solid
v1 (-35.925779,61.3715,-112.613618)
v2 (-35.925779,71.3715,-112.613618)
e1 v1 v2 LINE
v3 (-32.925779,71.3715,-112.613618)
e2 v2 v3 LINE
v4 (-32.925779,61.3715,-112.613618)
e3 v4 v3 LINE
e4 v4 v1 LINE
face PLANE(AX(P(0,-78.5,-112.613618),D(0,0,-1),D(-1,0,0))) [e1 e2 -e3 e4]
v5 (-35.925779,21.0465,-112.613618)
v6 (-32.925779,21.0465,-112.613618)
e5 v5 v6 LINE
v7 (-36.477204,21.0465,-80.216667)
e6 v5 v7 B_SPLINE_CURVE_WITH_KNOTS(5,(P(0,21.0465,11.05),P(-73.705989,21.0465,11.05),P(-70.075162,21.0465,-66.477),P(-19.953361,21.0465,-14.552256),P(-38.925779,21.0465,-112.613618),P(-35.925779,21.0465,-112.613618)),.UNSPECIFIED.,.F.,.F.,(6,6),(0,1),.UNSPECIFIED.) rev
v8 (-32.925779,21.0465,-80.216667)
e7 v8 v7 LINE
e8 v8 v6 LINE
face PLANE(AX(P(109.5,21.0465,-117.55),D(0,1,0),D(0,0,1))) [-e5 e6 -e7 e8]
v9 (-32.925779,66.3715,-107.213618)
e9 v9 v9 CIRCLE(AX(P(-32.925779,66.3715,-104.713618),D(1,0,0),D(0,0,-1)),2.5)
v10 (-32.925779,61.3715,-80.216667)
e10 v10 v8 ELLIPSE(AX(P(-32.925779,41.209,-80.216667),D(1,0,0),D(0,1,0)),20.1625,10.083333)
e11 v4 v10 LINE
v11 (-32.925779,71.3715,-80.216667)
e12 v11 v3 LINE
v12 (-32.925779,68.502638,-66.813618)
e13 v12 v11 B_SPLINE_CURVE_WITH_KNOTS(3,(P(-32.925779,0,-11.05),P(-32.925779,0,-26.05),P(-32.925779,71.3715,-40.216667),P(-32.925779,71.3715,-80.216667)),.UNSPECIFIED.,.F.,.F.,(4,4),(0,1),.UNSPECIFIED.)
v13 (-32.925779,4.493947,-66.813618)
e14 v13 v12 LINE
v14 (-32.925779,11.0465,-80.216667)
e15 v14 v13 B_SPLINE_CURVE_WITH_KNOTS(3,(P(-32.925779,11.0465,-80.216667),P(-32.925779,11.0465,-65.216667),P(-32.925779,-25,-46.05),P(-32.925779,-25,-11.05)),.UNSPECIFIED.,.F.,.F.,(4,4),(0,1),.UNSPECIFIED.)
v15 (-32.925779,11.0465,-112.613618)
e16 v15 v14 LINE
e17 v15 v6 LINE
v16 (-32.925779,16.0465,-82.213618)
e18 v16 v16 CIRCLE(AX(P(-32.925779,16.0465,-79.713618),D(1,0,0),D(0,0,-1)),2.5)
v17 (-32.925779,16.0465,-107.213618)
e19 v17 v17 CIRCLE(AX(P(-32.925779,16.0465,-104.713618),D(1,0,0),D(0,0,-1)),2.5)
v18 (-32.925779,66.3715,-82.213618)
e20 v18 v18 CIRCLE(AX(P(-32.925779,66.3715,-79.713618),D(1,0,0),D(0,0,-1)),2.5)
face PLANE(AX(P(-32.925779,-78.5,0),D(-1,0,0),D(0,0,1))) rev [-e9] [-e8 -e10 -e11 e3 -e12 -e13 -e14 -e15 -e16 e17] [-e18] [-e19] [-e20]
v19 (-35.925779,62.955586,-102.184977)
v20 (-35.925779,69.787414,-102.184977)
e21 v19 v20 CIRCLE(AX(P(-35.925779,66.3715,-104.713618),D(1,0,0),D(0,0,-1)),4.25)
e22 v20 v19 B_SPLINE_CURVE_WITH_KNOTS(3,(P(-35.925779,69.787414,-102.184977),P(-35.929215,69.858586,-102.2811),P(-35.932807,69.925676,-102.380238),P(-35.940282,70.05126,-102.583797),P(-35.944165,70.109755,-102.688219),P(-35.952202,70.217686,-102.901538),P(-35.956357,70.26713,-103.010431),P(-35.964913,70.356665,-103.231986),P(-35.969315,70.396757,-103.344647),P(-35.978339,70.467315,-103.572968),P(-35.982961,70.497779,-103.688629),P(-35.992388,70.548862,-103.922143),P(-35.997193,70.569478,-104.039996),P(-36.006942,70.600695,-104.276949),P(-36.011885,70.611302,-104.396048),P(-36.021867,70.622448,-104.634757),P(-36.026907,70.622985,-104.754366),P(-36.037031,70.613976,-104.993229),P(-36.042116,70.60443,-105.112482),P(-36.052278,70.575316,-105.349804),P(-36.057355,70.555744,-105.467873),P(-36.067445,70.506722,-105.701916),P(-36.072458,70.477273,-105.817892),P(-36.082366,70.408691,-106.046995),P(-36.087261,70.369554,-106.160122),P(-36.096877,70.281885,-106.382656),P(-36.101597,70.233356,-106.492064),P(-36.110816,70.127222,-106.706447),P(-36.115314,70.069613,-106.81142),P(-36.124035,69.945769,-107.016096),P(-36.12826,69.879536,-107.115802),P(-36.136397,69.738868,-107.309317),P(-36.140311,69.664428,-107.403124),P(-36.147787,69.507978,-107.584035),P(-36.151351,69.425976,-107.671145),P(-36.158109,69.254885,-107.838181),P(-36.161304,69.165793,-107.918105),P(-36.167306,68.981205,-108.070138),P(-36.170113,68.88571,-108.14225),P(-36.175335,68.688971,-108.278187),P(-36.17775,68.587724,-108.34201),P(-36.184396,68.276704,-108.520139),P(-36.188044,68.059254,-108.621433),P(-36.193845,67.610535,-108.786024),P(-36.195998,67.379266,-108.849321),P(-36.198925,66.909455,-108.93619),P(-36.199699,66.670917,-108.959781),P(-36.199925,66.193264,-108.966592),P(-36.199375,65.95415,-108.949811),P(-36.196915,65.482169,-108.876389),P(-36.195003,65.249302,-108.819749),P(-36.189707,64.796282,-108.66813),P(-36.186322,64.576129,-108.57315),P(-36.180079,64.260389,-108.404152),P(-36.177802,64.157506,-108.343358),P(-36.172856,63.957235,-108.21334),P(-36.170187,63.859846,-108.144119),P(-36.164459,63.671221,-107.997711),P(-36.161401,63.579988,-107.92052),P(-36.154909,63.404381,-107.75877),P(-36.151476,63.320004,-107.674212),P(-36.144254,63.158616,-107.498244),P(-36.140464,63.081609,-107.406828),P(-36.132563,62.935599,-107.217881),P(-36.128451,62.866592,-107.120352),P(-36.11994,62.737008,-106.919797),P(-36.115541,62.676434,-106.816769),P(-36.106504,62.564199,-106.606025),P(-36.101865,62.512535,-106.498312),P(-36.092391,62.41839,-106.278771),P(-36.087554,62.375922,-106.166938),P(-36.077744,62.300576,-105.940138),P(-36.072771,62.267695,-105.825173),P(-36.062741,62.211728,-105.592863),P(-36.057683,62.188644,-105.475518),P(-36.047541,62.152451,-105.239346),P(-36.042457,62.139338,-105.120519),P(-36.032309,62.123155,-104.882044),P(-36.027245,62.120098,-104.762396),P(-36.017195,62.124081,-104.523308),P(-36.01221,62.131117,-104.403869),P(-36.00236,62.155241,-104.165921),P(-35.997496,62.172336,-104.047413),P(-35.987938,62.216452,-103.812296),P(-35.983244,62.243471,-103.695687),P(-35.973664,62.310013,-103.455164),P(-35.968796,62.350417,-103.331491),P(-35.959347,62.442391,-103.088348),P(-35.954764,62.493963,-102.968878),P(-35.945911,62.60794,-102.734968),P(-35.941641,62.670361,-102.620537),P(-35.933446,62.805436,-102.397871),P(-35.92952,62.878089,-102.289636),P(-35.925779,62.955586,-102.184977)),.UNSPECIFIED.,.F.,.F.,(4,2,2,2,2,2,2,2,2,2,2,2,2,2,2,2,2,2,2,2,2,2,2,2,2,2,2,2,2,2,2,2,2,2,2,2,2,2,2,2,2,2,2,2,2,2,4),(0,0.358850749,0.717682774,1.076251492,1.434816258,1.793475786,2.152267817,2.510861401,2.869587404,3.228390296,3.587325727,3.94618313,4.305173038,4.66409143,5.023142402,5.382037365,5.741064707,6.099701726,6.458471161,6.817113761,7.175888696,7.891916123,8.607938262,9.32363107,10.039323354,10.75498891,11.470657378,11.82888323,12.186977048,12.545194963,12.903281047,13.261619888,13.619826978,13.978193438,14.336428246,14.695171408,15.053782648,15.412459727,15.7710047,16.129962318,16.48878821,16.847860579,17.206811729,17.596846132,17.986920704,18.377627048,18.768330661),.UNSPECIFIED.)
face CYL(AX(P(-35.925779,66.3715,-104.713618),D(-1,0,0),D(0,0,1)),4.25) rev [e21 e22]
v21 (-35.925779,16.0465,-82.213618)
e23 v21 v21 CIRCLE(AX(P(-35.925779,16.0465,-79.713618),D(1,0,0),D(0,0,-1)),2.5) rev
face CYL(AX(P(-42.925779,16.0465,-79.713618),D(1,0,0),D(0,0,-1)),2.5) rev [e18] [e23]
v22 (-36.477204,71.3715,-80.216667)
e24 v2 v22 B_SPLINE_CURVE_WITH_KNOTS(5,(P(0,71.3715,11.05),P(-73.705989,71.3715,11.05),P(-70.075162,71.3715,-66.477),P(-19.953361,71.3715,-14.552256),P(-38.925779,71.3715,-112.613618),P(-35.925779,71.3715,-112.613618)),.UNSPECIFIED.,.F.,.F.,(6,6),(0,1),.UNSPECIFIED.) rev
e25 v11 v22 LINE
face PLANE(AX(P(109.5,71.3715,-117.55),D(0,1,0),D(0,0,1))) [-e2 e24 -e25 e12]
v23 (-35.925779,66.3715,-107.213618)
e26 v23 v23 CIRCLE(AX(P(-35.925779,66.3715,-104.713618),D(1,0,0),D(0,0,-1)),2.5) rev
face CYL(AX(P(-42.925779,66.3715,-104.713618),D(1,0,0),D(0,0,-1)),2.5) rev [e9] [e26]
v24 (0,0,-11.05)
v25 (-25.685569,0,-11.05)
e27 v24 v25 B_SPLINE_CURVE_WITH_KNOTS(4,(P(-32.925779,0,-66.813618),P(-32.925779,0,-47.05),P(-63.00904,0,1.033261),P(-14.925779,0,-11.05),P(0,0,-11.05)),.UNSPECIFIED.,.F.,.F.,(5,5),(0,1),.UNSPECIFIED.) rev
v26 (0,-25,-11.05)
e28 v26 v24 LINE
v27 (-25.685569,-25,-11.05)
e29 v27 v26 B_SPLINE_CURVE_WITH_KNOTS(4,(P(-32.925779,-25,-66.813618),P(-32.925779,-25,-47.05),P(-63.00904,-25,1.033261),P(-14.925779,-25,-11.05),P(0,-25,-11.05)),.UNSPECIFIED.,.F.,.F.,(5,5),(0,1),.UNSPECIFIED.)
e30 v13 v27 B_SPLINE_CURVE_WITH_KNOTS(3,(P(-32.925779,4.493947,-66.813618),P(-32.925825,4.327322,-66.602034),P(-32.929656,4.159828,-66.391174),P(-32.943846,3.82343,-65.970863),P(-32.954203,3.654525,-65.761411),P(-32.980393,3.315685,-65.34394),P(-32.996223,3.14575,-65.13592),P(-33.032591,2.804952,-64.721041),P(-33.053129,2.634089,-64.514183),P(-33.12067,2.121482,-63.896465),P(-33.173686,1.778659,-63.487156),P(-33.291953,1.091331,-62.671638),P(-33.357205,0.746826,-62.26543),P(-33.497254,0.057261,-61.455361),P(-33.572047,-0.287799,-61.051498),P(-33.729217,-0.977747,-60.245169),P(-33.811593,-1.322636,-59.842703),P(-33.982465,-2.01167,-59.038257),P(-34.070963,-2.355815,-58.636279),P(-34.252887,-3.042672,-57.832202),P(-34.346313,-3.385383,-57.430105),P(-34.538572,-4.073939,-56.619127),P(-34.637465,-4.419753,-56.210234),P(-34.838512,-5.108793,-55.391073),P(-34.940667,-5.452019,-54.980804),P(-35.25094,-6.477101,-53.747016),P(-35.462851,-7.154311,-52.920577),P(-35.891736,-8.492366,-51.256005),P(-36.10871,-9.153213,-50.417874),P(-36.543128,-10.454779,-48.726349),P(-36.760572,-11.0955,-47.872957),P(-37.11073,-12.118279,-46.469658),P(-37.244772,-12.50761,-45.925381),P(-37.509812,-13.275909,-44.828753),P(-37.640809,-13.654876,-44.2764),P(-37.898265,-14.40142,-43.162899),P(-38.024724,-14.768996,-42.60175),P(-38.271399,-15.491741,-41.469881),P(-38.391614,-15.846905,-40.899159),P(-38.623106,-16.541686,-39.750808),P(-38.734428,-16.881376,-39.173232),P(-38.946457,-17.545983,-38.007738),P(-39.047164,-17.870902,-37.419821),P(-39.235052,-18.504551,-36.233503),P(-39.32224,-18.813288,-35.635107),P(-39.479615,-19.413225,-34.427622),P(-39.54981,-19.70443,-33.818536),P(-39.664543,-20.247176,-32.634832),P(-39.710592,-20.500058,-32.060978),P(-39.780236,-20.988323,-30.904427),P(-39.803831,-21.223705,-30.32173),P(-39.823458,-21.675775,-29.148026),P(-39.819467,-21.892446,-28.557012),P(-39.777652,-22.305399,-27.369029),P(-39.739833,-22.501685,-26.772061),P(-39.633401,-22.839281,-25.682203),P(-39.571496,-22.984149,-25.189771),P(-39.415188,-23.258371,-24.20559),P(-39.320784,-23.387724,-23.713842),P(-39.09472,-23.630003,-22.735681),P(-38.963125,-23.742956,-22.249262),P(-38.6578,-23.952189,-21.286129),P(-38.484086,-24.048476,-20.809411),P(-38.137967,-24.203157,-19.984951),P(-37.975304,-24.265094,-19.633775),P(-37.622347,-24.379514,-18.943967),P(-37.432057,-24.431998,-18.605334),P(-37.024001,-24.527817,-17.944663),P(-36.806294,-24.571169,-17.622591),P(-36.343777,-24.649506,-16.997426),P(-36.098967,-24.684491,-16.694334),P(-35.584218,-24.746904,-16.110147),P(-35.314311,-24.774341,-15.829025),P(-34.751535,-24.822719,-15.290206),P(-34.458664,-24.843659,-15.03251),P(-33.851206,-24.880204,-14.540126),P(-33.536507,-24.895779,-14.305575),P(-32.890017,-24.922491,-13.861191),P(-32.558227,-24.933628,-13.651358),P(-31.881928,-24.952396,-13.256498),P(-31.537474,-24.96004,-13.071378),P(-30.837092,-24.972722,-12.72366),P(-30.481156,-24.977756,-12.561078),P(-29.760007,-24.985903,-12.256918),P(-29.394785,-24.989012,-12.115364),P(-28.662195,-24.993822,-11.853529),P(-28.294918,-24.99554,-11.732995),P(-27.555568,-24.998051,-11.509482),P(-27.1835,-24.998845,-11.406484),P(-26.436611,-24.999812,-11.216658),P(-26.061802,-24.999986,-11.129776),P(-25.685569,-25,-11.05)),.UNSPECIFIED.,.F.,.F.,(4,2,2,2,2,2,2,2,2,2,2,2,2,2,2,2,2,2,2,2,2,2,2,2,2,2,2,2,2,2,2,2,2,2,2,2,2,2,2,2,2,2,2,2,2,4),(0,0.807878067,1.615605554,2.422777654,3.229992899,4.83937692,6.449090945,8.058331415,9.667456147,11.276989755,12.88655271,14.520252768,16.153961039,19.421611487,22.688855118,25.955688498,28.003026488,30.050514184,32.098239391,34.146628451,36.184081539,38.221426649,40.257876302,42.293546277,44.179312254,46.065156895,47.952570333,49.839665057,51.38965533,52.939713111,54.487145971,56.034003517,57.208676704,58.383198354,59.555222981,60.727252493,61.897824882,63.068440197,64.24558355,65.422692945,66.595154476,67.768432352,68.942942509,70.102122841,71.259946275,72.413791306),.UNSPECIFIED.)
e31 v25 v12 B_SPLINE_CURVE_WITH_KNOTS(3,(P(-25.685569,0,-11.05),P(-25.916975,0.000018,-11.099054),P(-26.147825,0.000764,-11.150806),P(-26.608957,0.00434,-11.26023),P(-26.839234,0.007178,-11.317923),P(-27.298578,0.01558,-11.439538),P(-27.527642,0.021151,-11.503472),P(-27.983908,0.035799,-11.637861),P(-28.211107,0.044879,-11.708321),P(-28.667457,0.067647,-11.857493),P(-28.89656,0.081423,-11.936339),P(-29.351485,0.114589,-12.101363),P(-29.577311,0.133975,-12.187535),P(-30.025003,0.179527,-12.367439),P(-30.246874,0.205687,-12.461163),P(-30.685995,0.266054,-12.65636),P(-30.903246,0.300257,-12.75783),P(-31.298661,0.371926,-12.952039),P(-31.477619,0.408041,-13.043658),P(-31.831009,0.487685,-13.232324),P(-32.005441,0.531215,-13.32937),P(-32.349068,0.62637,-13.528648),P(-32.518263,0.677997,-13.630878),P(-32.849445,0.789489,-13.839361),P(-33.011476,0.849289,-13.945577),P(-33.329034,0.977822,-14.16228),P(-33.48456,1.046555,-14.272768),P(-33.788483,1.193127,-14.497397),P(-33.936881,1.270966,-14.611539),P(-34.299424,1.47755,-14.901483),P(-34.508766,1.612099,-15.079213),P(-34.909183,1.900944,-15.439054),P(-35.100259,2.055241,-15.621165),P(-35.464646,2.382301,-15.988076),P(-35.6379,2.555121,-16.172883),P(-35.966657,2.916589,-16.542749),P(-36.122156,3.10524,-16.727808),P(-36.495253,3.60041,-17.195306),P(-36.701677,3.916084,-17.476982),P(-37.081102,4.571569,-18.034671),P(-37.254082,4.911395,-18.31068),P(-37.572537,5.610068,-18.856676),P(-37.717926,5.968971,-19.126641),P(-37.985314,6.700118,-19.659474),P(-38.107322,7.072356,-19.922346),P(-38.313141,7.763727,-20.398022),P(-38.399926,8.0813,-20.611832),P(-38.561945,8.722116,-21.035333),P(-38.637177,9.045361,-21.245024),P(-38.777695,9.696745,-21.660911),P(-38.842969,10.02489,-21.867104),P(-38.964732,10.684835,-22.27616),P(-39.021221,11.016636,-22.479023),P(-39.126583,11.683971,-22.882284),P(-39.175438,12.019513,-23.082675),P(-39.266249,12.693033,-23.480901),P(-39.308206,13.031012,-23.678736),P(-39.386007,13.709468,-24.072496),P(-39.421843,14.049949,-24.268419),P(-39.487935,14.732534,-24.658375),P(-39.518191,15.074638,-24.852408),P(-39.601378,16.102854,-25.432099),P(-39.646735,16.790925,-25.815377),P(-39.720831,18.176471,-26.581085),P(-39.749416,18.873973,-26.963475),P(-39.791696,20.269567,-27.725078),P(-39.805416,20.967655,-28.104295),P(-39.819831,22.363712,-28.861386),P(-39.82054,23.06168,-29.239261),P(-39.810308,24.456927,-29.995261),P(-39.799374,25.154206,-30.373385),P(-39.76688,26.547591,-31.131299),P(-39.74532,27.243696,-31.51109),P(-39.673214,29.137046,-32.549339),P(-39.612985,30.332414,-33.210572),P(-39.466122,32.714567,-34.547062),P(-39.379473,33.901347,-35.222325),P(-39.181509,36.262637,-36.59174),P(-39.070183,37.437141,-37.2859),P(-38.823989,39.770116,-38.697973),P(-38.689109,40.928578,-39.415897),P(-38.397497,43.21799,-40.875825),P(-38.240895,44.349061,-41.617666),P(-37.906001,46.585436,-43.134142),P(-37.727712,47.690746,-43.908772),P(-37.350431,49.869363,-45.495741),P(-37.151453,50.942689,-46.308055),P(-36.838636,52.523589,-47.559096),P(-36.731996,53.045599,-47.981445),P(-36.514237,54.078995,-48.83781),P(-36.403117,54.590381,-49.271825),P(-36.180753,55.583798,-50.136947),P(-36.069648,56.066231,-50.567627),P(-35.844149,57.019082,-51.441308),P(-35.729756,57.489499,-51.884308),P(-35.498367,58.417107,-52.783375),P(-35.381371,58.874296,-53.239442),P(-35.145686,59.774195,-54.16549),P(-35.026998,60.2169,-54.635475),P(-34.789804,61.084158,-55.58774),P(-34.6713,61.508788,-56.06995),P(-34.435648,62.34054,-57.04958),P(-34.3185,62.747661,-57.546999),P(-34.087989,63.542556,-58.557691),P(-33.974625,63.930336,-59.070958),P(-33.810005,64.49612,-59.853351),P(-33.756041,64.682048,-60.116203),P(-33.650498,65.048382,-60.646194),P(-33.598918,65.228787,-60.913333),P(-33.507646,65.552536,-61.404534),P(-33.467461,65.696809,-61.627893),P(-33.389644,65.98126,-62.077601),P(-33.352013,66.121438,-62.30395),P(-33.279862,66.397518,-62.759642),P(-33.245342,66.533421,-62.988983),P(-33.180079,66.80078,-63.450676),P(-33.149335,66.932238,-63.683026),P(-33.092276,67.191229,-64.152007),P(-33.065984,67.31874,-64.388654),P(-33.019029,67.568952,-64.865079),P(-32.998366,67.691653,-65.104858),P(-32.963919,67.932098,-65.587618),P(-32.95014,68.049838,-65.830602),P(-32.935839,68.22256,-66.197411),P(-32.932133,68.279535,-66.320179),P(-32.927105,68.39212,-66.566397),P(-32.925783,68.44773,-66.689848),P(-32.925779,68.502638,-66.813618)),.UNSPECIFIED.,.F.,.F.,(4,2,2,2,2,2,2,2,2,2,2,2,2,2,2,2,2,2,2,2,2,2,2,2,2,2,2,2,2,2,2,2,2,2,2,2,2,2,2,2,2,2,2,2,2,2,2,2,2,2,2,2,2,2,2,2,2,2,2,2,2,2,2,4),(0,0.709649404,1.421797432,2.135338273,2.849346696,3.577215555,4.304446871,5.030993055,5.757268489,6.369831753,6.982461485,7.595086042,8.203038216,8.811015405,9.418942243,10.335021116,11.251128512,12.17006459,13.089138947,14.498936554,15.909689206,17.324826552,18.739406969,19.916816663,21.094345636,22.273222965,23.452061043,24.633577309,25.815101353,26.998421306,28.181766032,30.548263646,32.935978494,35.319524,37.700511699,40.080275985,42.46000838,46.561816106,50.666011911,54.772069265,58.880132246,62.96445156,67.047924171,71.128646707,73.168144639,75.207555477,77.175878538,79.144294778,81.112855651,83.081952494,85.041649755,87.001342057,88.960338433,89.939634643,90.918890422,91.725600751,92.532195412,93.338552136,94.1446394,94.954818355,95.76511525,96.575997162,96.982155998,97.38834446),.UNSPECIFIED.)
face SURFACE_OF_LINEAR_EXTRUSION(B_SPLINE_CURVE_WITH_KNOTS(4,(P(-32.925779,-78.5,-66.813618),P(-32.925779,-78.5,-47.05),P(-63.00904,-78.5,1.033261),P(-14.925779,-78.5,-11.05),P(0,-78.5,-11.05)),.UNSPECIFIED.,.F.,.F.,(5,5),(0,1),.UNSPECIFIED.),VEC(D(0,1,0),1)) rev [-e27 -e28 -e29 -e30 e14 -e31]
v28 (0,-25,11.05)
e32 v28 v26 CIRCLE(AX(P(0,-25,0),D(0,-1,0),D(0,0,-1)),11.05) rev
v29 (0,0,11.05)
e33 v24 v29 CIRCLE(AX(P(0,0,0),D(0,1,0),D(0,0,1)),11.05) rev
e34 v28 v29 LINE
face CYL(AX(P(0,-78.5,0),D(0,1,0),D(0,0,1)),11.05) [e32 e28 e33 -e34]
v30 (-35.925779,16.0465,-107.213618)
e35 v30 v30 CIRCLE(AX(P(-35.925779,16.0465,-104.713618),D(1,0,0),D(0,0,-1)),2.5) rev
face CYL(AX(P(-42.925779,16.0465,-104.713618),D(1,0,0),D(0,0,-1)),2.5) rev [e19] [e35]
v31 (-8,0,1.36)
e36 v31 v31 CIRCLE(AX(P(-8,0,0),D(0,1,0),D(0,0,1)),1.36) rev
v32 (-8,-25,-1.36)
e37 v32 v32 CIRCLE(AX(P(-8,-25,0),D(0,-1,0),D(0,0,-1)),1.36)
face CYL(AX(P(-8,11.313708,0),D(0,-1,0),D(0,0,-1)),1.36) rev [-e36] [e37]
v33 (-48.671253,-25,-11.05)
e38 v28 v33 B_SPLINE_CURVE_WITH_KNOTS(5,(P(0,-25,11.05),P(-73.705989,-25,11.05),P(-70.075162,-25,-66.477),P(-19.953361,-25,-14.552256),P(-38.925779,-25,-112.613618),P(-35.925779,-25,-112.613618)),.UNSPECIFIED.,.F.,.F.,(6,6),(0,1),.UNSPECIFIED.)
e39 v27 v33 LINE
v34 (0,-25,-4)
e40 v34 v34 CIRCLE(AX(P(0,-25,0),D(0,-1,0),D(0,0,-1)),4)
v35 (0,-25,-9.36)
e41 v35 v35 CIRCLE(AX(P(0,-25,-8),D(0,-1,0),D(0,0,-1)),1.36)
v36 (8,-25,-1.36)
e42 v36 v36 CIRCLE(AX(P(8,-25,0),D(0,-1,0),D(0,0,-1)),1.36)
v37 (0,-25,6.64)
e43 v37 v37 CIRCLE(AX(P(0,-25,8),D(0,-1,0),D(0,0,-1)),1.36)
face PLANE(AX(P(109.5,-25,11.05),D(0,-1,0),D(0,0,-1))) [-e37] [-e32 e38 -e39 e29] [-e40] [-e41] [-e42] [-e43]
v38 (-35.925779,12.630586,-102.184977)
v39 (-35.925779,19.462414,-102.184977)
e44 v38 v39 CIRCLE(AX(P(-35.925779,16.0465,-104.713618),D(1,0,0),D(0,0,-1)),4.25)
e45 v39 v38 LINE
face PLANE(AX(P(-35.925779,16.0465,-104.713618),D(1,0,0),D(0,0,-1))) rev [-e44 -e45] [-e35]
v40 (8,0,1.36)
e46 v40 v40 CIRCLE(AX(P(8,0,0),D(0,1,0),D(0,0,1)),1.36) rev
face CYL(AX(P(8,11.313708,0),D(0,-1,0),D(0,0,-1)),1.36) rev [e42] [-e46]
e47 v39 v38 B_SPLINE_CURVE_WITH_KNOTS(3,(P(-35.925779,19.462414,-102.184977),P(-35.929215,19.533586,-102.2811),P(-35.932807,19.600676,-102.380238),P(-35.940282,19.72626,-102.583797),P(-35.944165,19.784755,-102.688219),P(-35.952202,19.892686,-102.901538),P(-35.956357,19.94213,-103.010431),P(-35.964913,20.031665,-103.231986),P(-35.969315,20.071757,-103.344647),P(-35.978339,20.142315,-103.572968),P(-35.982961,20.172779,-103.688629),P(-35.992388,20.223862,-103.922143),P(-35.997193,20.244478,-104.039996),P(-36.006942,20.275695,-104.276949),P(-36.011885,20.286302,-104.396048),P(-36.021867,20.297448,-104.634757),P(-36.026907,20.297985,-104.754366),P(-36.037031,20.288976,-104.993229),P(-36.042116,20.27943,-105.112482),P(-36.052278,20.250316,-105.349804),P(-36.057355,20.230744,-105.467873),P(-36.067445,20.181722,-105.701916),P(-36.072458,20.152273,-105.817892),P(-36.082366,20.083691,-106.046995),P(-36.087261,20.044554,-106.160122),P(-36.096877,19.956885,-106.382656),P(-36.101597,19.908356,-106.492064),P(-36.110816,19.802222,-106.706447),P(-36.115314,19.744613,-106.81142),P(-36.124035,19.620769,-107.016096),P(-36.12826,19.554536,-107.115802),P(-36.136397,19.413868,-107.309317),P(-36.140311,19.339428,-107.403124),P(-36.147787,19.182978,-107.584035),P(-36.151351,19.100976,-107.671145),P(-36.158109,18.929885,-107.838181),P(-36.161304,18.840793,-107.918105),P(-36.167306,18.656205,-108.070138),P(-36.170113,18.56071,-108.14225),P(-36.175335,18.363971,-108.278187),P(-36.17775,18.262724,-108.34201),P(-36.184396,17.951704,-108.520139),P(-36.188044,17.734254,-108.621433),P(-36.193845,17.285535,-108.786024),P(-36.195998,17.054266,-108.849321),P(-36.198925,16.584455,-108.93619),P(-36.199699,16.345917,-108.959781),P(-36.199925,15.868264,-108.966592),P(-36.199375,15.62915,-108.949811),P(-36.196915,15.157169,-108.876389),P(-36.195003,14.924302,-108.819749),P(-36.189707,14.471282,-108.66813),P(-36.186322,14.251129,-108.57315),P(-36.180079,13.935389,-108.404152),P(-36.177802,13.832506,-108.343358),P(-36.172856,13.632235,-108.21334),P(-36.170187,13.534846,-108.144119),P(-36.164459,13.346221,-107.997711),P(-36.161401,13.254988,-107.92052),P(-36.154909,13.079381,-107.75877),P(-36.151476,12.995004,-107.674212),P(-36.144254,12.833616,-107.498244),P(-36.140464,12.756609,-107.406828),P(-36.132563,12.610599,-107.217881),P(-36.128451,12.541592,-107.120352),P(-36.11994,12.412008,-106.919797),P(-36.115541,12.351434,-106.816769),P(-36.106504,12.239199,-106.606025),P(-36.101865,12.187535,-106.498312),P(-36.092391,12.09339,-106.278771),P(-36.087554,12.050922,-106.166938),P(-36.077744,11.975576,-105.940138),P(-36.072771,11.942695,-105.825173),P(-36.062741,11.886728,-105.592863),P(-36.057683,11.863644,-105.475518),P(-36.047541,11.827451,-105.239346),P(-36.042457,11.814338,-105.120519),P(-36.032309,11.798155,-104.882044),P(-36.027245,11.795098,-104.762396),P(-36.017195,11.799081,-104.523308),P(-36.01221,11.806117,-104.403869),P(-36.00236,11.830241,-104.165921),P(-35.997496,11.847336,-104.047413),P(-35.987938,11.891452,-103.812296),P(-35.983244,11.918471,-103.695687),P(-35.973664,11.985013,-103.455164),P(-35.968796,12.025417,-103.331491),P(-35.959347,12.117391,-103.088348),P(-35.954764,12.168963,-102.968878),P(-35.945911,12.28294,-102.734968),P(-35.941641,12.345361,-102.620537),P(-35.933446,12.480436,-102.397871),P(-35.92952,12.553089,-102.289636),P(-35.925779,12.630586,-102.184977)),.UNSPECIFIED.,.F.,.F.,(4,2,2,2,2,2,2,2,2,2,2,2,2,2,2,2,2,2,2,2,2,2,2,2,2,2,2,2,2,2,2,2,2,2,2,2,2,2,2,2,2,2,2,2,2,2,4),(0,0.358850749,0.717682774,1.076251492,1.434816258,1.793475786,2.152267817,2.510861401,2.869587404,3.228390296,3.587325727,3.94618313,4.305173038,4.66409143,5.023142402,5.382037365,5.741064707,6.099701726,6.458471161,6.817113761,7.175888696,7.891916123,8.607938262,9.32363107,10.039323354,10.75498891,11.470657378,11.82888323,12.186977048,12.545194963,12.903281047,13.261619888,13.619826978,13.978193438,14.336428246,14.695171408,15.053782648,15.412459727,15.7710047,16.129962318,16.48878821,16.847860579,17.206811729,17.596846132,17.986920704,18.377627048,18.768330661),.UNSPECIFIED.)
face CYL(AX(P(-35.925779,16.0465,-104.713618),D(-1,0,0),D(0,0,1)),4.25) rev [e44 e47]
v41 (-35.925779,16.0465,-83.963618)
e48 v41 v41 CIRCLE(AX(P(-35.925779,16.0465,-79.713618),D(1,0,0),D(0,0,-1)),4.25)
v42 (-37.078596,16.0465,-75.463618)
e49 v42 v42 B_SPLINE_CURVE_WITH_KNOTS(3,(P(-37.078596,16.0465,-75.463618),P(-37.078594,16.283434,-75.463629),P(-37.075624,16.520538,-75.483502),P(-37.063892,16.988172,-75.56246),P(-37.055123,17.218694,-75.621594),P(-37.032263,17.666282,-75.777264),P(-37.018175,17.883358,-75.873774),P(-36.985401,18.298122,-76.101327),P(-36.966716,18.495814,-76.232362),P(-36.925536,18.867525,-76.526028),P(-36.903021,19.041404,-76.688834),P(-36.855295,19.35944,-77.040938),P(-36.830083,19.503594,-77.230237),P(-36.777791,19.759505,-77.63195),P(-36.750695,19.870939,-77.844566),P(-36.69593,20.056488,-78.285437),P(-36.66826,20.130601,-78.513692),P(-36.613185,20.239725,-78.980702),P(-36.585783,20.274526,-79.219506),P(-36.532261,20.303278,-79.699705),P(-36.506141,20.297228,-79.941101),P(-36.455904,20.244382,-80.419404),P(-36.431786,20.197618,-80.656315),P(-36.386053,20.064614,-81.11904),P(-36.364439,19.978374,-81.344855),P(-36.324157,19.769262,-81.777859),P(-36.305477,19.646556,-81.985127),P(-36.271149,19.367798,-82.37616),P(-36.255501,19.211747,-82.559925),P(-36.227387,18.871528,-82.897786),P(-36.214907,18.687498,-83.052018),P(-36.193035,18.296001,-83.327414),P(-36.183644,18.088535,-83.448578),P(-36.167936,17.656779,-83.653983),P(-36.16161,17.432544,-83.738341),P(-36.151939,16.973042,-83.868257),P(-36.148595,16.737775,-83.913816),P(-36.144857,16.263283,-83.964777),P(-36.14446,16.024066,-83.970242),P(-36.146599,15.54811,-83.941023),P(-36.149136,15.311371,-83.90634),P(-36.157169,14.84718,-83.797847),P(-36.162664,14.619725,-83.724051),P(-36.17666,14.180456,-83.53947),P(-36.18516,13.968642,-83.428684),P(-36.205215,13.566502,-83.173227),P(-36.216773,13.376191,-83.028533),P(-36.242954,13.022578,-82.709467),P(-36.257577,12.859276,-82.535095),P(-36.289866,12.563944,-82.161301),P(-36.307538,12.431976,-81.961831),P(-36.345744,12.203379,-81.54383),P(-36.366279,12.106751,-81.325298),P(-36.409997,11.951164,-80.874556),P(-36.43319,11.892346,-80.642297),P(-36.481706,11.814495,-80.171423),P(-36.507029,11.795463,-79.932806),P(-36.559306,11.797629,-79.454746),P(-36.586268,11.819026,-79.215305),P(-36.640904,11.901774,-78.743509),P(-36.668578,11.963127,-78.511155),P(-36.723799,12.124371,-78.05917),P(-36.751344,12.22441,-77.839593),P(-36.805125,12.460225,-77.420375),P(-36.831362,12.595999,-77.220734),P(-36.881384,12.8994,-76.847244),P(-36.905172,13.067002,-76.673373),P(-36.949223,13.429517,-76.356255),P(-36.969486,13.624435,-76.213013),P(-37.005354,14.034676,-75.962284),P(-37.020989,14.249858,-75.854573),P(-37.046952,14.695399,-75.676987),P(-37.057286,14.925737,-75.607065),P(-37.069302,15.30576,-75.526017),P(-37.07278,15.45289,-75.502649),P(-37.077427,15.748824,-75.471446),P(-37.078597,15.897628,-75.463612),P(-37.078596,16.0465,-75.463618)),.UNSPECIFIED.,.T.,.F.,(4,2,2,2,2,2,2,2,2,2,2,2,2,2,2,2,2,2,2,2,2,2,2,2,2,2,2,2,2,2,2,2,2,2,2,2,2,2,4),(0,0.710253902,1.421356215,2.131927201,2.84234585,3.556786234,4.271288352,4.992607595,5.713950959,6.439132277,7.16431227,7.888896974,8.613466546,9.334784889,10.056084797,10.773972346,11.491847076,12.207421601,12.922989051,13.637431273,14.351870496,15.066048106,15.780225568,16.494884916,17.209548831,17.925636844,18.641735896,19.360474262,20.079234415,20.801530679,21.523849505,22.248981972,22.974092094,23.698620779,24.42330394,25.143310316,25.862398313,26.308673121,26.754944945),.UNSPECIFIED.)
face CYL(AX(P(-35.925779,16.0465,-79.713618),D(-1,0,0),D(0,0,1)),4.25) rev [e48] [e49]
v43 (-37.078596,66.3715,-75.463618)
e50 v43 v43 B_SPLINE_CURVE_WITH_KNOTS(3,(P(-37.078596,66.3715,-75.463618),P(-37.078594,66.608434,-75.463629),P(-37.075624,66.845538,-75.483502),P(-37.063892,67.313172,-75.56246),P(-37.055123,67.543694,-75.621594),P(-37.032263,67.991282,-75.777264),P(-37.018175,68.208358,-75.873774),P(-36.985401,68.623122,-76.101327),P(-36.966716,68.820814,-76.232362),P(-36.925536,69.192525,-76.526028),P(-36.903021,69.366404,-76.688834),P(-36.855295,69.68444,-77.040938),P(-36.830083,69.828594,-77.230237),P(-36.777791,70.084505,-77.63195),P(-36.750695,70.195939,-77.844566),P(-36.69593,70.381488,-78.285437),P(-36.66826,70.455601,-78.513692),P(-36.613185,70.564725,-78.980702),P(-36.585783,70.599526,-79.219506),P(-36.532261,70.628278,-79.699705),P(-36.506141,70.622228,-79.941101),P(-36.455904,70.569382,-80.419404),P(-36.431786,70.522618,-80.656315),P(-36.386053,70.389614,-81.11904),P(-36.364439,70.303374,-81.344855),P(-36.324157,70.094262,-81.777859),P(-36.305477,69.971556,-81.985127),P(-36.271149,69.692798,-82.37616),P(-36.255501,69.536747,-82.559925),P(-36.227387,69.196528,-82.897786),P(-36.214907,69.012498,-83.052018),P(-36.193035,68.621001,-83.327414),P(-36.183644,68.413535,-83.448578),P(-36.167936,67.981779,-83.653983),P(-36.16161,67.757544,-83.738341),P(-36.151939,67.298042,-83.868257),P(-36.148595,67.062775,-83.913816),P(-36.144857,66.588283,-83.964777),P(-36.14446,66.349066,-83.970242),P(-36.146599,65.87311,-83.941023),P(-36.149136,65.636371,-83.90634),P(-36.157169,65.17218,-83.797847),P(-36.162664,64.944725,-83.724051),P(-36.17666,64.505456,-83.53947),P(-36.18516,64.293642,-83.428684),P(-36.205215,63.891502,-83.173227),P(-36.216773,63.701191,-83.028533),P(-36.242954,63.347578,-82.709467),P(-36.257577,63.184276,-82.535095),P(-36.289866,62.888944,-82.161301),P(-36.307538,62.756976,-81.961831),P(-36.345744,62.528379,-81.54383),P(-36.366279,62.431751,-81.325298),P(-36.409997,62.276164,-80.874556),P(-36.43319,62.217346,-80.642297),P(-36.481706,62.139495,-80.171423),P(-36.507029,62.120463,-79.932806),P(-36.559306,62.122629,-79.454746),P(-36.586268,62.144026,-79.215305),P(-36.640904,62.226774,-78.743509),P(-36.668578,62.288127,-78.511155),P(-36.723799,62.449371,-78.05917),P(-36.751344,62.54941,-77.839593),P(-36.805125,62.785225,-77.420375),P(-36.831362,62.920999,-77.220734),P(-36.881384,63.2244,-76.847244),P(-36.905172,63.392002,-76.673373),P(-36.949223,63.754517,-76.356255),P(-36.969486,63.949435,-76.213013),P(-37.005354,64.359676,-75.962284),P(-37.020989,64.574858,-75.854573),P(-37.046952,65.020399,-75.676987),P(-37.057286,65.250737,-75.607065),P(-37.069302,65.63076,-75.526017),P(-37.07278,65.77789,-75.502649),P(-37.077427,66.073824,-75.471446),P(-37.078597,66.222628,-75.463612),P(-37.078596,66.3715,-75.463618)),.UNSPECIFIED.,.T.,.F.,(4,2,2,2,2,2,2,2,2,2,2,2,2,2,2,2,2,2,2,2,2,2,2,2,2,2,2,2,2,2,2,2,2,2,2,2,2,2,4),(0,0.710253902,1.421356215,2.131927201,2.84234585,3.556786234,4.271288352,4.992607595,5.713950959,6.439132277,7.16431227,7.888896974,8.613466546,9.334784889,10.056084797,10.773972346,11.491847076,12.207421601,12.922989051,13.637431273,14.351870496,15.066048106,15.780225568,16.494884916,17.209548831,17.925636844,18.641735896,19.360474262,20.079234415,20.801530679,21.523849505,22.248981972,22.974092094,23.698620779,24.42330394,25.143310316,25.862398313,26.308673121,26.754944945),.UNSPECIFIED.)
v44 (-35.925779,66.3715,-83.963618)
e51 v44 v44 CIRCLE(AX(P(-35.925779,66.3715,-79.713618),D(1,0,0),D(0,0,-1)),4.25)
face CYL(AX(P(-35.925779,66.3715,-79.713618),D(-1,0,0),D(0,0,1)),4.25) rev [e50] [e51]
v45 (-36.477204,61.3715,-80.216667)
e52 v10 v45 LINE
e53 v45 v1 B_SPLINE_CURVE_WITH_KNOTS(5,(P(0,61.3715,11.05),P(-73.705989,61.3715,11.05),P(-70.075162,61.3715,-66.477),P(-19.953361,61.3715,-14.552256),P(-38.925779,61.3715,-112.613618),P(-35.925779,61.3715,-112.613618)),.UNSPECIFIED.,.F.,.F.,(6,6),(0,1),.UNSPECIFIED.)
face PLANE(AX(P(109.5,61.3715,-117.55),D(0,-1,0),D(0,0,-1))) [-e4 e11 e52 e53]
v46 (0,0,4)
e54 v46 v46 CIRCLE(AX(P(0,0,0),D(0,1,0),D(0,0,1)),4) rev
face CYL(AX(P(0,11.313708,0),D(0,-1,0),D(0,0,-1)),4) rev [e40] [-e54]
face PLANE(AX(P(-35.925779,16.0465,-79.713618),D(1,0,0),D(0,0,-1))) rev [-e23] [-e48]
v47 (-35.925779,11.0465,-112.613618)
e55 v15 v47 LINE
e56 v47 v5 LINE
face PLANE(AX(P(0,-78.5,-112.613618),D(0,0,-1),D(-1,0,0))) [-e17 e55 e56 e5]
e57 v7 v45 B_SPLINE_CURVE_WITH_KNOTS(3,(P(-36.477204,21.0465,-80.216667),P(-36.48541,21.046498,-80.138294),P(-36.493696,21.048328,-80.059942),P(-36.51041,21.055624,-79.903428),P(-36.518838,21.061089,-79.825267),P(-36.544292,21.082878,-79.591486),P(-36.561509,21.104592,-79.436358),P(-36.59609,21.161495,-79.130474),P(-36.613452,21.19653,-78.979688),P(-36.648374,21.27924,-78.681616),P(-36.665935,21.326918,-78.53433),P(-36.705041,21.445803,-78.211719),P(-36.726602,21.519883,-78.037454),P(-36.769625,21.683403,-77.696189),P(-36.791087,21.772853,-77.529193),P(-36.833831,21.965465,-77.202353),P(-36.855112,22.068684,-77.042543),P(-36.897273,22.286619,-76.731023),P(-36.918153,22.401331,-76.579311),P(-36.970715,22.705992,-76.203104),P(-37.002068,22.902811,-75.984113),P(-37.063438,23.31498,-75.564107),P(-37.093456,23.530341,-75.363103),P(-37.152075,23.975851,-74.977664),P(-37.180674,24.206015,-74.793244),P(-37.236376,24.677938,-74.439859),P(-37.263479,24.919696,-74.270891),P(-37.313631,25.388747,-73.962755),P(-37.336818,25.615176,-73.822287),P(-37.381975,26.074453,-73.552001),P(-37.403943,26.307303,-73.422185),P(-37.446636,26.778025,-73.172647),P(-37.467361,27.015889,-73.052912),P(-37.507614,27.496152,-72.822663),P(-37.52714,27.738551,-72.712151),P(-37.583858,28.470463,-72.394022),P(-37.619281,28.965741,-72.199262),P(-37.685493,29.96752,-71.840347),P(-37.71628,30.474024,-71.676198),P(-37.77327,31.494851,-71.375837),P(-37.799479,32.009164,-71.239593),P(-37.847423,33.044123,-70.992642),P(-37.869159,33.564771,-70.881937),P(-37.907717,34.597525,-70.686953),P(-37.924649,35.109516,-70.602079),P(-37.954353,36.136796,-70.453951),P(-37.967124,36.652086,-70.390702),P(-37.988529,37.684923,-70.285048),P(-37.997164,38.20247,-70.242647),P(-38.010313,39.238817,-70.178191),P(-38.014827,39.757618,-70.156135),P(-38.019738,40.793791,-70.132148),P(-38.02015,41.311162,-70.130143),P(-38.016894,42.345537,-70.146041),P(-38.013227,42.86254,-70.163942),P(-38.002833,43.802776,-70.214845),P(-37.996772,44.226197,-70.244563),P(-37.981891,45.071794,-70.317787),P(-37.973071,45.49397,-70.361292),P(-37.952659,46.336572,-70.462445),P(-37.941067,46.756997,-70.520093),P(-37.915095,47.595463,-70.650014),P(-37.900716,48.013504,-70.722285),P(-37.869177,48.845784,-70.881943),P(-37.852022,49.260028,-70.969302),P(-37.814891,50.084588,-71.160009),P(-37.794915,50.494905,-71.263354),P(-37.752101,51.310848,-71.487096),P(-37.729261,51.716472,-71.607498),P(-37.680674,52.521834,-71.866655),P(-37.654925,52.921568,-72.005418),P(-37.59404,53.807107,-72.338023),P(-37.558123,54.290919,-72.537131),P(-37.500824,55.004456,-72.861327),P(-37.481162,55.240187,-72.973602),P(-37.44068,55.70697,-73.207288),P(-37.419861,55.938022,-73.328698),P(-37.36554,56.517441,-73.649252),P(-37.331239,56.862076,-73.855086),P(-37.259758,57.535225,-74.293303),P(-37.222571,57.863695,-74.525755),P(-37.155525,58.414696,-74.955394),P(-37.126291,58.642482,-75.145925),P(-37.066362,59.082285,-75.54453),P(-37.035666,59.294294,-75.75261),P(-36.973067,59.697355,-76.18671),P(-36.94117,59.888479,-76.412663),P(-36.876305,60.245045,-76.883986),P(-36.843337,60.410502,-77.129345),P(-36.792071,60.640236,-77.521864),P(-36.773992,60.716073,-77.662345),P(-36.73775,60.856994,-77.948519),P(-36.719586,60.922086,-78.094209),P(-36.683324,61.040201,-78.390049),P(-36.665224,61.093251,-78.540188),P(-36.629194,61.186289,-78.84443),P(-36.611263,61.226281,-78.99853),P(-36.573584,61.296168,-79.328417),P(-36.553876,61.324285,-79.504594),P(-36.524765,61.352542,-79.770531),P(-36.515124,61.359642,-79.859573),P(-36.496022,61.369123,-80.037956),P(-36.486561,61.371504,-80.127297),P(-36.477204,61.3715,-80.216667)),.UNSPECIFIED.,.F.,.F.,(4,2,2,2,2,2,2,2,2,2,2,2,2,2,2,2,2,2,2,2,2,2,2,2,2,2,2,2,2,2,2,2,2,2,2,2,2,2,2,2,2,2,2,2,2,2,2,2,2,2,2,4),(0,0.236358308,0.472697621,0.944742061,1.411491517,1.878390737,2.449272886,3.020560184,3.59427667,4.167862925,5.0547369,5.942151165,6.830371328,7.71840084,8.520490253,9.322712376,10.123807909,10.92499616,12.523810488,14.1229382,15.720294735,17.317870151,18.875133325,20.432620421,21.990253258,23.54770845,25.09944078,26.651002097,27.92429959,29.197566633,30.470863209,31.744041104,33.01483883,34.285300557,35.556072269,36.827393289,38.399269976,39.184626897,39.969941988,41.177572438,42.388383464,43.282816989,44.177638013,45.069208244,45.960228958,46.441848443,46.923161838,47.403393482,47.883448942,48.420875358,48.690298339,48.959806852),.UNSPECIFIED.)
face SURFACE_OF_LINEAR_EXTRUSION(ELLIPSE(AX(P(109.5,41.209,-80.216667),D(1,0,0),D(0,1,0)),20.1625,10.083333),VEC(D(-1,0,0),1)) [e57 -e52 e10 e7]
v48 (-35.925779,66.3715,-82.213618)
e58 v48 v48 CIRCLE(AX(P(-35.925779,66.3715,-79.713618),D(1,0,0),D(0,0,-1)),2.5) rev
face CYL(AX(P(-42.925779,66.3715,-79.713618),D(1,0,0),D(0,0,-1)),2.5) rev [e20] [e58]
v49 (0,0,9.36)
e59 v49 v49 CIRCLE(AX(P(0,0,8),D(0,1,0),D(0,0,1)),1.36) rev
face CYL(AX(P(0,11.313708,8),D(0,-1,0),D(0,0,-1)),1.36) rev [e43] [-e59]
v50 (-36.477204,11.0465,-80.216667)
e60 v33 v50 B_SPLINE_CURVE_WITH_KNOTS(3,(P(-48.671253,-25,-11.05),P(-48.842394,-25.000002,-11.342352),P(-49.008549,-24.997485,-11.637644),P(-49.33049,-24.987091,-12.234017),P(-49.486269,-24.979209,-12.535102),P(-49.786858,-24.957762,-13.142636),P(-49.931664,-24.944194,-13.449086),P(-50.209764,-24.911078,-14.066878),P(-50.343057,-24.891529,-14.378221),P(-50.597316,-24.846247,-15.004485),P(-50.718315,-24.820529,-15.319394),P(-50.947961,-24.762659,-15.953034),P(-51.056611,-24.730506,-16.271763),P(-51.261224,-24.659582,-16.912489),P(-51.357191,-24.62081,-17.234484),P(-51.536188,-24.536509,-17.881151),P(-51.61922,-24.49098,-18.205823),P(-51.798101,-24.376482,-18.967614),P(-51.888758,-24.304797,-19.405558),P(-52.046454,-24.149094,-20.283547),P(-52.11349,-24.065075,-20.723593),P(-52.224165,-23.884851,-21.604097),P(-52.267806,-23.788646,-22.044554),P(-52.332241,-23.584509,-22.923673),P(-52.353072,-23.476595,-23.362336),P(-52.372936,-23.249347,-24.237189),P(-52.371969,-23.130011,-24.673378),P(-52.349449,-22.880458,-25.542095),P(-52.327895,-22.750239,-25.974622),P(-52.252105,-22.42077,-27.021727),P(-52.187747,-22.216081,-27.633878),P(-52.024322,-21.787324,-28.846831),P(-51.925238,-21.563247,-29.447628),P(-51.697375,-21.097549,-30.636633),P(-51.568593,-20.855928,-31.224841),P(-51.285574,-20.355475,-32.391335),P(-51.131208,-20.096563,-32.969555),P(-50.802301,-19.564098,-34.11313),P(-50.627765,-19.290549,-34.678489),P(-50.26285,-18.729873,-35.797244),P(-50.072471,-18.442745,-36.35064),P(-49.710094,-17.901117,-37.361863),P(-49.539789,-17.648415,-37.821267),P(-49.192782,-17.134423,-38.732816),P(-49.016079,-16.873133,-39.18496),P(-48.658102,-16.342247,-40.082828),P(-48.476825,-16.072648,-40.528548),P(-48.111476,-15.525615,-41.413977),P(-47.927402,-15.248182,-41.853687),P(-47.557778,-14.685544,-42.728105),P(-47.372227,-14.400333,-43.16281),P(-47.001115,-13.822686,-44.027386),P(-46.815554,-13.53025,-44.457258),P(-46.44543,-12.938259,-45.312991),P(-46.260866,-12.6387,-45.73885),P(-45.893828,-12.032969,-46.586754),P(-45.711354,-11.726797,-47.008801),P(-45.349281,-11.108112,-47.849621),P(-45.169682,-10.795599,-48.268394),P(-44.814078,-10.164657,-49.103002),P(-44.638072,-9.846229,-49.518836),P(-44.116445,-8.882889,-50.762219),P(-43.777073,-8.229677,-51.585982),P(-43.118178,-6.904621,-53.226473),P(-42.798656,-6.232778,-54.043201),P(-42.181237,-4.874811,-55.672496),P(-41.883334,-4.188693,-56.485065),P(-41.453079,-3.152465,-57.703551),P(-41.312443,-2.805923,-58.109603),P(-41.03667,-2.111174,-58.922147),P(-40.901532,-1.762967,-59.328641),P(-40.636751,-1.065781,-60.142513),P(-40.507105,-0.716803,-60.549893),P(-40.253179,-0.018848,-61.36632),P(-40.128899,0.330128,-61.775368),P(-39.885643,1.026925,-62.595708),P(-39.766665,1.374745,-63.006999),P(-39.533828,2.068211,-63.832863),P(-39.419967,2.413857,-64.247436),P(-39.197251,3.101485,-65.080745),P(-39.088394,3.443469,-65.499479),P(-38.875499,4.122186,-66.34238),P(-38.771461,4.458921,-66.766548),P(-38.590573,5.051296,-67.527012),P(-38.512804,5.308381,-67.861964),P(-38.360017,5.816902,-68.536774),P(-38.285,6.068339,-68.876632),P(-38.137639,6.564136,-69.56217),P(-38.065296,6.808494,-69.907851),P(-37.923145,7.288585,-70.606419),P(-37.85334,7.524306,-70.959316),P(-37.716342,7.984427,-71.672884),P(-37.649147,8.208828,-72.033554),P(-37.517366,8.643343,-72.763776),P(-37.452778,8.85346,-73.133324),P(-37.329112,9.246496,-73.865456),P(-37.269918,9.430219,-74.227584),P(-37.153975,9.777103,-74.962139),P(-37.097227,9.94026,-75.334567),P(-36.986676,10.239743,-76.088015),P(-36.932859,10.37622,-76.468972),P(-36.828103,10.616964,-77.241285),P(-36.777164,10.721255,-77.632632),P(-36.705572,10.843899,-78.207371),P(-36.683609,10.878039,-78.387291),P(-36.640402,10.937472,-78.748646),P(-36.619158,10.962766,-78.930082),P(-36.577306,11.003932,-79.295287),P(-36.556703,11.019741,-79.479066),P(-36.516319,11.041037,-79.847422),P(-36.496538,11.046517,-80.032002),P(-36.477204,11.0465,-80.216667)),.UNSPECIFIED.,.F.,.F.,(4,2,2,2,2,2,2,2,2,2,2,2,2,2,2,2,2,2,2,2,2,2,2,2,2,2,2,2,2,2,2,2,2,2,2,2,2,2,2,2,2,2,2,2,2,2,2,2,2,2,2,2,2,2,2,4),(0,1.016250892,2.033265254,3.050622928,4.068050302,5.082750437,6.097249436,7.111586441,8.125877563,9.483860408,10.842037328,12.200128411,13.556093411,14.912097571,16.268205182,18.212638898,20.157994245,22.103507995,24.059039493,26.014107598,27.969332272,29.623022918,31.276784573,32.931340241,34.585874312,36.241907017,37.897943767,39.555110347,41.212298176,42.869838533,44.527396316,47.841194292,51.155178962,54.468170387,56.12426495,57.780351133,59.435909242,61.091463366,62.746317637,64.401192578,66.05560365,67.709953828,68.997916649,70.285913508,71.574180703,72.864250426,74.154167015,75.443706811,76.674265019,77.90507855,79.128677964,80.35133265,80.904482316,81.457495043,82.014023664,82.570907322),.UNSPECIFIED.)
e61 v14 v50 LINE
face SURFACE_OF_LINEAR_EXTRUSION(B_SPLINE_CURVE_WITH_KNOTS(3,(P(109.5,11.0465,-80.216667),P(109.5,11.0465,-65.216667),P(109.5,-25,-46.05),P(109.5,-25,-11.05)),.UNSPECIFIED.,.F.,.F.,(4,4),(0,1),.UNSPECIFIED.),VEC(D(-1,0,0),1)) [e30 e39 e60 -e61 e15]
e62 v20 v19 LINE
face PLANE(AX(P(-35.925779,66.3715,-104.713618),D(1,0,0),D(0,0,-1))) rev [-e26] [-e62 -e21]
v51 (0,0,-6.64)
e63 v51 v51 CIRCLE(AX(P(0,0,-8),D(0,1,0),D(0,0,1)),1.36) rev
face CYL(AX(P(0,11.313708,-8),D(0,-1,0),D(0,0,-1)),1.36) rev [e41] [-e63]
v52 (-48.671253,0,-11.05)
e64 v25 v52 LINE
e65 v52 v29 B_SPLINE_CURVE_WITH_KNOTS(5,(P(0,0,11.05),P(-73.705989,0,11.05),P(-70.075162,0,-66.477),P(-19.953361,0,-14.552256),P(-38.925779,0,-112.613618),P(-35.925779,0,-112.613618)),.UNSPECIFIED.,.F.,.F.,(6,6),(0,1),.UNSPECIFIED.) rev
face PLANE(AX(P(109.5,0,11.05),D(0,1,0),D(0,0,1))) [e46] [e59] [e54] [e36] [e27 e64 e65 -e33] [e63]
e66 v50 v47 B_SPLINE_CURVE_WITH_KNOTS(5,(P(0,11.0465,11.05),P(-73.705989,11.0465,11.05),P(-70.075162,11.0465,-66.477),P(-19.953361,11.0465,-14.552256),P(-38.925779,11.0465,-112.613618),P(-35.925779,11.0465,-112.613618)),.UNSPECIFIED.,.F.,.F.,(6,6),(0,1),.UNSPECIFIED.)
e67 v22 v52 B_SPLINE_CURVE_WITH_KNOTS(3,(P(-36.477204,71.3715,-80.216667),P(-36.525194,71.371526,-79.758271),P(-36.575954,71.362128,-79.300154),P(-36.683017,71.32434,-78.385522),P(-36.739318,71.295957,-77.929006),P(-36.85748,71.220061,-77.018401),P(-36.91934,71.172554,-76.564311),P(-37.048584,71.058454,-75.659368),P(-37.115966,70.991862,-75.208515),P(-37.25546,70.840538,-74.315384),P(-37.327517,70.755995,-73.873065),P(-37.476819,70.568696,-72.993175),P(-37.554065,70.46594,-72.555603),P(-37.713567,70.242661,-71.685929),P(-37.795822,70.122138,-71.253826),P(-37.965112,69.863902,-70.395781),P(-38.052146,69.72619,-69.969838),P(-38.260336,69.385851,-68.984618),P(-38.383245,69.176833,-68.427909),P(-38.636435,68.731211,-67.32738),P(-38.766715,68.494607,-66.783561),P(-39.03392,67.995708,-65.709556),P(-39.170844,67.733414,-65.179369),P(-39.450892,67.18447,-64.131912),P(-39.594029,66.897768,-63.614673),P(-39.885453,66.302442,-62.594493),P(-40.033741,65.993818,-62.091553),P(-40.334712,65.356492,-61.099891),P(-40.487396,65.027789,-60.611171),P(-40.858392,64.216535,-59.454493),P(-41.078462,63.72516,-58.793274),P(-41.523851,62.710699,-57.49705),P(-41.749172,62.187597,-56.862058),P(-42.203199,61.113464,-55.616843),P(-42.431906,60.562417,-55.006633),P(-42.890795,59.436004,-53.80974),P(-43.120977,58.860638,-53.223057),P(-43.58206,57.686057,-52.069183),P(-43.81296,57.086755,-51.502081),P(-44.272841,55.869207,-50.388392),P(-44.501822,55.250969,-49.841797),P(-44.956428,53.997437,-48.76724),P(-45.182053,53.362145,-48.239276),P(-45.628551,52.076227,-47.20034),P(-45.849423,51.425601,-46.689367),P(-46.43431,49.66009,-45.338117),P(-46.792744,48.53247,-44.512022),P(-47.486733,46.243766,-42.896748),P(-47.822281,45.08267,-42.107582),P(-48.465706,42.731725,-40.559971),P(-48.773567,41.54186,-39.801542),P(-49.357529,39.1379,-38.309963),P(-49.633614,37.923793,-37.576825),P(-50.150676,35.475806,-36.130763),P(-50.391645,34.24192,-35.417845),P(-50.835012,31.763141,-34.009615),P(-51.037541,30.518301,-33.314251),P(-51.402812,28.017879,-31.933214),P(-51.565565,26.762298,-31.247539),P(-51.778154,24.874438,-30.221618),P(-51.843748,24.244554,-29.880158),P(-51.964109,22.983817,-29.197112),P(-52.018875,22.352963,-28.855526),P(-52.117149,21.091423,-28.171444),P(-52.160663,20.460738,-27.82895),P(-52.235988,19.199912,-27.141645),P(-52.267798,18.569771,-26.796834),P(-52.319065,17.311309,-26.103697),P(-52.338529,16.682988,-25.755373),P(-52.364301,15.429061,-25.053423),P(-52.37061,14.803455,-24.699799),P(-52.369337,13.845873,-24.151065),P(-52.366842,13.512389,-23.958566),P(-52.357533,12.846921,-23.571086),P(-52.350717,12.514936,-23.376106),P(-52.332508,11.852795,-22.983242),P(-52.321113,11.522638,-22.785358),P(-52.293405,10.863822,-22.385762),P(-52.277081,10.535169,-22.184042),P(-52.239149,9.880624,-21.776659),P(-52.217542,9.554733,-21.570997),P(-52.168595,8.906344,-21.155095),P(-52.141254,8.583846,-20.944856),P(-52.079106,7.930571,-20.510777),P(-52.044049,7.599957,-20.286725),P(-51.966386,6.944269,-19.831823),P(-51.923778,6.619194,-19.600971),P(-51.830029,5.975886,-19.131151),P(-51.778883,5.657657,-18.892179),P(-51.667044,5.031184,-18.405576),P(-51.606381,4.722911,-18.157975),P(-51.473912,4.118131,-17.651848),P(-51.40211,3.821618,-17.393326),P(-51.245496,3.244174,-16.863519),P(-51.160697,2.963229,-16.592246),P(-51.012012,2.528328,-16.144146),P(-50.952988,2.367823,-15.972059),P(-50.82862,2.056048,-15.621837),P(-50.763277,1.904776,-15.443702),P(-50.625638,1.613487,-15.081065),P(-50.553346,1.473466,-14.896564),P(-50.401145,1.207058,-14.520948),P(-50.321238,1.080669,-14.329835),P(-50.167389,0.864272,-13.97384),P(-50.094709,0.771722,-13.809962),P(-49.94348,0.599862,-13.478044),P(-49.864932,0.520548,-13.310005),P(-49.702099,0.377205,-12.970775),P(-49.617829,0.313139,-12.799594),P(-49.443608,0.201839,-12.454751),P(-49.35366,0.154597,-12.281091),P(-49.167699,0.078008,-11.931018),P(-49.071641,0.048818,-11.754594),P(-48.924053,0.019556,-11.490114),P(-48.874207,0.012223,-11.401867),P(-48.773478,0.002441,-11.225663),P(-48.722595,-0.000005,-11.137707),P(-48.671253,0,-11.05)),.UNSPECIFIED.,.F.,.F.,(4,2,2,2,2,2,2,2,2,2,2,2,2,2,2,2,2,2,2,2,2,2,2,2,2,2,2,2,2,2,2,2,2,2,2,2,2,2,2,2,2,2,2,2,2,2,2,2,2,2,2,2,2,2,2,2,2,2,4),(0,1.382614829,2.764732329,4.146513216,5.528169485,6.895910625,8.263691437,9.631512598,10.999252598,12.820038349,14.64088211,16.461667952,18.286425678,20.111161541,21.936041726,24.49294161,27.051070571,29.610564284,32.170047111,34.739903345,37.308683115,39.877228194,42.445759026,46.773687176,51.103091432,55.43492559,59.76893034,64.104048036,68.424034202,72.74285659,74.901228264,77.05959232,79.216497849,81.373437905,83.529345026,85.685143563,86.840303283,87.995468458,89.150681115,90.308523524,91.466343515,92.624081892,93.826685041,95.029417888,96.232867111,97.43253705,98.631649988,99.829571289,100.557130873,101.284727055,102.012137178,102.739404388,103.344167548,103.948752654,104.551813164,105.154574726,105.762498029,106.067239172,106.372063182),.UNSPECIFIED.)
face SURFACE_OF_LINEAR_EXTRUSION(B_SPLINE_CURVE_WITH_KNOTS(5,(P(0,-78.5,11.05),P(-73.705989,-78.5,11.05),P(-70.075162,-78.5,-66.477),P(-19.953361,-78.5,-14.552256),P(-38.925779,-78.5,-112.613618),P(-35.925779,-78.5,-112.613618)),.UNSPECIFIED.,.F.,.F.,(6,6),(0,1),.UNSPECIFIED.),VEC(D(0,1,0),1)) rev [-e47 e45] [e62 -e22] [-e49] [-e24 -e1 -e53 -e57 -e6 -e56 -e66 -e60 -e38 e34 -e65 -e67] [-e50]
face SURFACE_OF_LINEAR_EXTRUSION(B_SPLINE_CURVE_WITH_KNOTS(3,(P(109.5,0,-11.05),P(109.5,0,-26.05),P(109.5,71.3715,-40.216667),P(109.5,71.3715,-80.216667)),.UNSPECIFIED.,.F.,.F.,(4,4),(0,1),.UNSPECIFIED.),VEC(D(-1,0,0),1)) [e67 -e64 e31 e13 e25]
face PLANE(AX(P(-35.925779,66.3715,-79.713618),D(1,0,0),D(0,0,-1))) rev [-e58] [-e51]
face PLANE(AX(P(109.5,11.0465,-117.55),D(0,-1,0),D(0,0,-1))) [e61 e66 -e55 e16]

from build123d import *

# Parameters (mm, degrees)
BOSS_EXTRUDE1_START = -78.5
BOSS_EXTRUDE1_DEPTH = 157
SKETCH5_W           = 473.004377806
SKETCH5_H           = 558.860634618
CUT_EXTRUDE1_DEPTH  = 109.5
SKETCH6_R           = 1.36
SKETCH6_R_2         = 4
CUT_EXTRUDE2_DEPTH  = 25
SKETCH7_R           = 2.5
CUT_EXTRUDE3_DEPTH  = 10
SKETCH8_R           = 4.25
CUT_EXTRUDE4_DEPTH  = 2


# Read off the part's stored shape, not the designer's step: Boss-Extrude1
with BuildPart() as part:
    # Boss-Extrude1 outline → Boss-Extrude1 (new body)
    with BuildSketch(Plane.XZ.offset(BOSS_EXTRUDE1_START)):
        with BuildLine():
            ThreePointArc((0, -11.05), (11.05, 0), (0, 11.05))
            add(Edge.make_bspline(
                [(0, 11.05), (-73.705988569, 11.05), (-70.075162013, -66.476999877), (-19.953361107, -14.552256493), (-38.925778701, -112.613618432), (-35.925778701, -112.613618432)],
                knots=[0, 0, 0, 0, 0, 0, 1, 1, 1, 1, 1, 1], degree=5))
            Line((-35.925778701, -112.613618432), (-32.925778701, -112.613618432))
            Line((-32.925778701, -112.613618432), (-32.925778701, -66.813618432))
            add(Edge.make_bspline(
                [(-32.925778701, -66.813618432), (-32.925778701, -47.05), (-63.009039822, 1.033261121), (-14.925778701, -11.05), (0, -11.05)],
                knots=[0, 0, 0, 0, 0, 1, 1, 1, 1, 1], degree=4))
        make_face()
    extrude(amount=BOSS_EXTRUDE1_DEPTH)

    # Sketch5 → Cut-Extrude1 (cut, symmetric)
    with BuildSketch(Plane.ZY):
        with Locations((-57.495001252, 3.891745074)):
            Rectangle(SKETCH5_W, SKETCH5_H)
        with BuildLine():
            Line((-117.55, 11.0465), (-80.216666667, 11.0465))
            add(Edge.make_bspline(
                [(-11.05, -25), (-46.05, -25), (-65.216666667, 11.0465), (-80.216666667, 11.0465)],
                knots=[0, 0, 0, 0, 1, 1, 1, 1], degree=3))
            Line((-11.05, -25), (11.05, -25))
            Line((11.05, -25), (11.05, 0))
            Line((11.05, 0), (-11.05, 0))
            add(Edge.make_bspline(
                [(-11.05, 0), (-26.05, 0), (-40.216666667, 71.3715), (-80.216666667, 71.3715)],
                knots=[0, 0, 0, 0, 1, 1, 1, 1], degree=3))
            Line((-80.216666667, 71.3715), (-117.55, 71.3715))
            Line((-117.55, 71.3715), (-117.55, 61.3715))
            Line((-117.55, 61.3715), (-80.216666667, 61.3715))
            add(Edge.make_bspline(
                [(-80.216666667, 21.0465), (-70.133333333, 21.0465), (-70.133333333, 41.209), (-70.133333333, 61.3715), (-80.216666667, 61.3715)],
                knots=[3.141592654, 3.141592654, 3.141592654, 4.71238898, 4.71238898, 6.283185307, 6.283185307, 6.283185307], degree=2, weights=[1, 0.707106781, 1, 0.707106781, 1]))
            Line((-80.216666667, 21.0465), (-117.55, 21.0465))
            Line((-117.55, 21.0465), (-117.55, 11.0465))
        make_face(mode=Mode.SUBTRACT)
    extrude(amount=CUT_EXTRUDE1_DEPTH, both=True, mode=Mode.SUBTRACT)

    # Sketch6 → Cut-Extrude2 (cut)
    with BuildSketch(Plane.XZ.offset(25)):
        with Locations(Location((0, 8, 0), (0, 0, 270))):
            Circle(SKETCH6_R)
        with Locations(Location((0, 0, 0), (0, 0, 270))):
            Circle(SKETCH6_R_2)
        with Locations(Location((8, 0, 0), (0, 0, 270))):
            Circle(SKETCH6_R)
        with Locations(Location((-8, 0, 0), (0, 0, 270))):
            Circle(SKETCH6_R)
        with Locations(Location((0, -8, 0), (0, 0, 270))):
            Circle(SKETCH6_R)
    extrude(amount=-CUT_EXTRUDE2_DEPTH, mode=Mode.SUBTRACT)

    # Sketch7 → Cut-Extrude3 (cut)
    with BuildSketch(Plane(origin=(-32.925778701, 0, 0), x_dir=(0, 0, -1), z_dir=(1, 0, 0))):
        with Locations((79.713618432, 66.3715)):
            Circle(SKETCH7_R)
        with Locations((104.713618432, 66.3715)):
            Circle(SKETCH7_R)
        with Locations((104.713618432, 16.0465)):
            Circle(SKETCH7_R)
        with Locations((79.713618432, 16.0465)):
            Circle(SKETCH7_R)
    extrude(amount=-CUT_EXTRUDE3_DEPTH, mode=Mode.SUBTRACT)

    # Sketch8 → Cut-Extrude4 (cut)
    with BuildSketch(Plane(origin=(-37.925778701, 0, 0), x_dir=(0, 0, -1), z_dir=(1, 0, 0))):
        with Locations(Location((79.713618432, 66.3715, 0), (0, 0, 180))):
            Circle(SKETCH8_R)
        with Locations((104.713618432, 66.3715)):
            Circle(SKETCH8_R)
        with Locations((104.713618432, 16.0465)):
            Circle(SKETCH8_R)
        with Locations(Location((79.713618432, 16.0465, 0), (0, 0, 180))):
            Circle(SKETCH8_R)
    extrude(amount=CUT_EXTRUDE4_DEPTH, mode=Mode.SUBTRACT)


solid = part.part
